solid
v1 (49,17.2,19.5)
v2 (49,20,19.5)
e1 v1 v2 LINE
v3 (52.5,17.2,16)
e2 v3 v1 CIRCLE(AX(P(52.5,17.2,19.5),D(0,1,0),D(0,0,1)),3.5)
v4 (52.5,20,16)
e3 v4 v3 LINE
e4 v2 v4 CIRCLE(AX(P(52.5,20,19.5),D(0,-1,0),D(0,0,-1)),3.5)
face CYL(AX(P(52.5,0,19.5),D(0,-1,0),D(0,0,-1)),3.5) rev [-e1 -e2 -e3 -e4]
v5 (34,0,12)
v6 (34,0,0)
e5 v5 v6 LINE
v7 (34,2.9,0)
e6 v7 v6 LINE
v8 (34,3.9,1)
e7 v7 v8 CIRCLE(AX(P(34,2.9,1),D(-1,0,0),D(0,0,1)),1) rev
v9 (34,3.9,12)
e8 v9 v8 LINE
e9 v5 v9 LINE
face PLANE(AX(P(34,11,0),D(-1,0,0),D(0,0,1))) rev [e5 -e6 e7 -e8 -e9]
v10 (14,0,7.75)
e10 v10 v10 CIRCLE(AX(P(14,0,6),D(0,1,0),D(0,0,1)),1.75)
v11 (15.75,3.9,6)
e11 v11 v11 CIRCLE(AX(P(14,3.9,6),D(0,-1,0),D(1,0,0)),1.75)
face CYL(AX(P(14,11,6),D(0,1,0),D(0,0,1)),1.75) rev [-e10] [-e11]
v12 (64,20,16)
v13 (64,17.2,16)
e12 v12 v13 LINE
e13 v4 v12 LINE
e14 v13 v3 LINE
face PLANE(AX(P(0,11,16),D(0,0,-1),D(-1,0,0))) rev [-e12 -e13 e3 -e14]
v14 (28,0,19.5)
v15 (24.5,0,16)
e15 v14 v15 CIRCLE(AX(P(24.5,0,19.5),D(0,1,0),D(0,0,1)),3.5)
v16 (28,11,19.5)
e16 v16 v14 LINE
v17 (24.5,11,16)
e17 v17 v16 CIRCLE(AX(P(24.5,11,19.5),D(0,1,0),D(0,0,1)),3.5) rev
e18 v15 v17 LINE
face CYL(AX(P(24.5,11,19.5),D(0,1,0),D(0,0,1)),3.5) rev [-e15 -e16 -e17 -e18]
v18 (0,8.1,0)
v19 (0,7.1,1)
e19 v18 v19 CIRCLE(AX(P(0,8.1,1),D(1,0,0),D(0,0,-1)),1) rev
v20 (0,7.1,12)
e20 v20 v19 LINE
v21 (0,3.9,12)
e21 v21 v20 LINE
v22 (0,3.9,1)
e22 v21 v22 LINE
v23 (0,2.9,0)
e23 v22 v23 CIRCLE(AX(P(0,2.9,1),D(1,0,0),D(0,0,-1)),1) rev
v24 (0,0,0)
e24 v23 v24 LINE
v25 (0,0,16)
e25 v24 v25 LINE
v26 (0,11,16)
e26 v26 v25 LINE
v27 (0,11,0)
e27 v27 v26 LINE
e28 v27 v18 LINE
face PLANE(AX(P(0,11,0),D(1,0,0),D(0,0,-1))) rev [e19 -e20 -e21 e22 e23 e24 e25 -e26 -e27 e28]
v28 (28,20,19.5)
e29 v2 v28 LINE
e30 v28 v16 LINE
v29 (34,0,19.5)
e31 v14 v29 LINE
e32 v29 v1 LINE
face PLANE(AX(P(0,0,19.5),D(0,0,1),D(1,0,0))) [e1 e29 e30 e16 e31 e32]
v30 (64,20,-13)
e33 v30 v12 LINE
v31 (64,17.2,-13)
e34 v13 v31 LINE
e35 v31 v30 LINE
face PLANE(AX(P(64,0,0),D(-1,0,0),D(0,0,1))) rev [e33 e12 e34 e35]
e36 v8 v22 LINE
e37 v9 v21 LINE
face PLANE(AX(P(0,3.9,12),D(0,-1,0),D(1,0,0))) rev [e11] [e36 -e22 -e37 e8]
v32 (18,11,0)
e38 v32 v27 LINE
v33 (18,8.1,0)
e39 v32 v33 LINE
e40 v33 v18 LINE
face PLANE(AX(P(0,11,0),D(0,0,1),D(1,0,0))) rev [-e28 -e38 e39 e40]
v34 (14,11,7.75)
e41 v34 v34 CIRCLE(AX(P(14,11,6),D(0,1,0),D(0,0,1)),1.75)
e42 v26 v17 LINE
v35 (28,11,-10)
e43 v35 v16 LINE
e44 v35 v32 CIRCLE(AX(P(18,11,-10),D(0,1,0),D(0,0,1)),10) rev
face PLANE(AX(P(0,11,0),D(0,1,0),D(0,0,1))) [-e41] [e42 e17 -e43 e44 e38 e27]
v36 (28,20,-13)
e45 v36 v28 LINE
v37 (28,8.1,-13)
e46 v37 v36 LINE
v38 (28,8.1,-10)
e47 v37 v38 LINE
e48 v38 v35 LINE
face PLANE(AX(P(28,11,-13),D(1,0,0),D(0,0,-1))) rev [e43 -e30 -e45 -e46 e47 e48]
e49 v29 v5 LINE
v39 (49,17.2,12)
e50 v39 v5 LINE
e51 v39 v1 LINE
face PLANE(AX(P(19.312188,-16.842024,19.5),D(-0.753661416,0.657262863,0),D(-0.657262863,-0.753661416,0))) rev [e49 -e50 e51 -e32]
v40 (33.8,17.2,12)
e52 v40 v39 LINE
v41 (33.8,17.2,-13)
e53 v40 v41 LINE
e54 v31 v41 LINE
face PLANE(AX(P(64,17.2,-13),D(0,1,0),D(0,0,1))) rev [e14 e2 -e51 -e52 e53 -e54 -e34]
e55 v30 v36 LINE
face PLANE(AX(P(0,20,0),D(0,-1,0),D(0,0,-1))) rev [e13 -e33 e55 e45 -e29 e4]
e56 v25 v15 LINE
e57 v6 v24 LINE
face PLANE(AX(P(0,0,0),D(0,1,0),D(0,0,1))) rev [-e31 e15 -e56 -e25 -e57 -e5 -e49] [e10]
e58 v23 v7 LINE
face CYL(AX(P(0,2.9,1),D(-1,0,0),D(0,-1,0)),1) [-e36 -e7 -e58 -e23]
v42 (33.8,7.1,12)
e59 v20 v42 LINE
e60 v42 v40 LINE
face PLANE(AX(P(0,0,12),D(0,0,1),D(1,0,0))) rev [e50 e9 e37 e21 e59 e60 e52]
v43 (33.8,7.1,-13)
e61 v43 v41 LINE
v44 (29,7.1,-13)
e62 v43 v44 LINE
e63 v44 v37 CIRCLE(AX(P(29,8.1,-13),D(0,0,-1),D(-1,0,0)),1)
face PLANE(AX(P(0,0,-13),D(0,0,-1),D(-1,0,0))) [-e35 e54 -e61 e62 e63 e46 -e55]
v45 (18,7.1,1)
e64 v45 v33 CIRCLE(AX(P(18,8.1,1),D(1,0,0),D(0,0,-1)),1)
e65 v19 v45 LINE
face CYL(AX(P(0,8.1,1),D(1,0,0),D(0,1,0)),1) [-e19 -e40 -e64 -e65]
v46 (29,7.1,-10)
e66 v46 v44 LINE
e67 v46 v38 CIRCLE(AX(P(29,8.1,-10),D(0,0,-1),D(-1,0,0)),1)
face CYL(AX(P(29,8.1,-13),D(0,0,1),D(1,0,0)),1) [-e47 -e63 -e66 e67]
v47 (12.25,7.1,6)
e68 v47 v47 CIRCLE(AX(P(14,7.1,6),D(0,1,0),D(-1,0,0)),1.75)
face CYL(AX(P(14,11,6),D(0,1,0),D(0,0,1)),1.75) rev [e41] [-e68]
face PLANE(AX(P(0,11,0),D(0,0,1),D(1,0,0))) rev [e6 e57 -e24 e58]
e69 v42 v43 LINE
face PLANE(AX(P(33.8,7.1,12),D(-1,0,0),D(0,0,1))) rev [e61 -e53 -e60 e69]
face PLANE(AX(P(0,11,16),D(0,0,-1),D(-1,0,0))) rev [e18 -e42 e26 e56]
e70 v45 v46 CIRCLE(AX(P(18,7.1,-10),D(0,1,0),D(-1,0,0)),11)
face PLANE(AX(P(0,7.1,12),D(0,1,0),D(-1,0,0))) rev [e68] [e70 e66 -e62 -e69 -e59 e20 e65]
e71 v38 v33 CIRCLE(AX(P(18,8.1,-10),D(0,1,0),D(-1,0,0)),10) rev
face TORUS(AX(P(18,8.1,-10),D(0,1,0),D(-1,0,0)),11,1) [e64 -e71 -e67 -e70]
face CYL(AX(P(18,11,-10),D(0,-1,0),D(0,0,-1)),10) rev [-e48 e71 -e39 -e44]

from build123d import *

# Parameters (mm, degrees)
SKETCH_1_W          = 34
SKETCH_1_H          = 16
EXTRUDE_1_DEPTH     = 11
SKETCH_2_W          = 34
SKETCH_2_H          = 3.2
CUT_EXTRUDE_1_DEPTH = 12
HOLE_WIZARD_1_D     = 3.5
SKETCH_6_W          = 6
SKETCH_6_H          = 3.9
EXTRUDE_2_DEPTH     = 13
FILLET_1_R          = 10
SKETCH_7_W          = 6
SKETCH_7_H          = 29
EXTRUDE_3_DEPTH     = 9
SKETCH_8_W          = 29
SKETCH_8_H          = 2.8
EXTRUDE_4_DEPTH     = 30
EXTRUDE_6_DEPTH     = 3.5
FILLET_2_R          = 1
FILLET_3_R          = 3.5
FILLET_4_R          = 3.5
EXTRUDE_7_DEPTH     = 4
SKETCH_12_W         = 0.2
SKETCH_12_H         = 10.1
CUT_EXTRUDE_2_DEPTH = 25


# Some blends are built 0.0001 mm under size
with BuildPart() as part:
    # 草图1 → 凸台-拉伸1 (new body)
    with BuildSketch(Plane(origin=(0, 0, 0), x_dir=(1, 0, 0), z_dir=(0, 1, 0))):
        with Locations((17, -8)):
            Rectangle(SKETCH_1_W, SKETCH_1_H)
    extrude(amount=EXTRUDE_1_DEPTH)

    # 草图2 → 切除-拉伸1 (cut)
    with BuildSketch(Plane(origin=(0, 0, 0), x_dir=(-1, 0, 0), z_dir=(0, 0, -1))):
        with Locations((-17, 5.5)):
            Rectangle(SKETCH_2_W, SKETCH_2_H)
    extrude(amount=-CUT_EXTRUDE_1_DEPTH, mode=Mode.SUBTRACT)

    # 孔1 (through all)
    with Locations(Plane(origin=(0, 11, 0), x_dir=(1, 0, 0), z_dir=(0, 1, 0))):
        with Locations((14, -6)):
            Hole(HOLE_WIZARD_1_D / 2)

    # 草图6 → 凸台-拉伸2 (add)
    with BuildSketch(Plane(origin=(0, 0, 0), x_dir=(-1, 0, 0), z_dir=(0, 0, -1))):
        with Locations((-31, 9.05)):
            Rectangle(SKETCH_6_W, SKETCH_6_H)
    extrude(amount=EXTRUDE_2_DEPTH)

    # 圆角1
    fillet_1_edges = [part.edges().sort_by_distance(p)[0] for p in [
        (28, 9.05, 0),
    ]]
    fillet(fillet_1_edges, radius=FILLET_1_R)

    # 草图7 → 凸台-拉伸3 (add)
    with BuildSketch(Plane(origin=(0, 11, 0), x_dir=(1, 0, 0), z_dir=(0, 1, 0))):
        with Locations((31, -1.5)):
            Rectangle(SKETCH_7_W, SKETCH_7_H)
    extrude(amount=EXTRUDE_3_DEPTH)

    # 草图8 → 凸台-拉伸4 (add)
    with BuildSketch(Plane(origin=(34, 0, 0), x_dir=(0, 0, -1), z_dir=(1, 0, 0))):
        with Locations((-1.5, 18.6)):
            Rectangle(SKETCH_8_W, SKETCH_8_H)
    extrude(amount=EXTRUDE_4_DEPTH)

    # 草图10 → 凸台-拉伸6 (add)
    with BuildSketch(Plane.XY.offset(16)):
        Polygon((28, 0), (34, 0), (34, 17.2), (49, 17.2), (49, 20), (28, 20), (28, 11), align=None)
        Polygon((34, 17.2), (34, 0), (49, 17.2), align=None)
    extrude(amount=EXTRUDE_6_DEPTH)

    # 圆角2
    fillet_2_edges = [part.edges().sort_by_distance(p)[0] for p in [
        (9, 7.1, 0),
        (17, 3.9, 0),
        (28, 7.1, -11.5),
        (25.071067812, 7.1, -2.928932188),
    ]]
    fillet(fillet_2_edges, radius=FILLET_2_R)

    # 圆角3
    fillet_3_edges = [part.edges().sort_by_distance(p)[0] for p in [
        (28, 5.5, 16),
    ]]
    fillet(fillet_3_edges, radius=FILLET_3_R - 0.0001)  # a hair under: the kernel refuses the full size

    # 圆角4
    # the kernel refuses this fillet: 3.5 mm, written as the material it adds along each edge
    with BuildSketch(Plane(origin=(49, 17.2, 16), x_dir=(0, 0, 1), z_dir=(0, 1, 0))) as fillet_4_piece_1:
        with BuildLine():
            CenterArc((FILLET_4_R, FILLET_4_R), FILLET_4_R, 180, 90)
            Line((0, FILLET_4_R), (0, 0))
            Line((0, 0), (FILLET_4_R, 0))
        make_face()
    extrude(amount=2.8)

    # 草图11 → 凸台-拉伸7 (add)
    with BuildSketch(Plane(origin=(0, 0, 16), x_dir=(-1, 0, 0), z_dir=(0, 0, -1))):
        Polygon((-49, 17.2), (-34, 17.2), (-34, 0), align=None)
    extrude(amount=EXTRUDE_7_DEPTH)

    # 草图12 → 切除-拉伸2 (cut)
    with BuildSketch(Plane(origin=(0, 0, -13), x_dir=(-1, 0, 0), z_dir=(0, 0, -1))):
        with Locations((-33.9, 12.15)):
            Rectangle(SKETCH_12_W, SKETCH_12_H)
    extrude(amount=-CUT_EXTRUDE_2_DEPTH, mode=Mode.SUBTRACT)


solid = part.part
